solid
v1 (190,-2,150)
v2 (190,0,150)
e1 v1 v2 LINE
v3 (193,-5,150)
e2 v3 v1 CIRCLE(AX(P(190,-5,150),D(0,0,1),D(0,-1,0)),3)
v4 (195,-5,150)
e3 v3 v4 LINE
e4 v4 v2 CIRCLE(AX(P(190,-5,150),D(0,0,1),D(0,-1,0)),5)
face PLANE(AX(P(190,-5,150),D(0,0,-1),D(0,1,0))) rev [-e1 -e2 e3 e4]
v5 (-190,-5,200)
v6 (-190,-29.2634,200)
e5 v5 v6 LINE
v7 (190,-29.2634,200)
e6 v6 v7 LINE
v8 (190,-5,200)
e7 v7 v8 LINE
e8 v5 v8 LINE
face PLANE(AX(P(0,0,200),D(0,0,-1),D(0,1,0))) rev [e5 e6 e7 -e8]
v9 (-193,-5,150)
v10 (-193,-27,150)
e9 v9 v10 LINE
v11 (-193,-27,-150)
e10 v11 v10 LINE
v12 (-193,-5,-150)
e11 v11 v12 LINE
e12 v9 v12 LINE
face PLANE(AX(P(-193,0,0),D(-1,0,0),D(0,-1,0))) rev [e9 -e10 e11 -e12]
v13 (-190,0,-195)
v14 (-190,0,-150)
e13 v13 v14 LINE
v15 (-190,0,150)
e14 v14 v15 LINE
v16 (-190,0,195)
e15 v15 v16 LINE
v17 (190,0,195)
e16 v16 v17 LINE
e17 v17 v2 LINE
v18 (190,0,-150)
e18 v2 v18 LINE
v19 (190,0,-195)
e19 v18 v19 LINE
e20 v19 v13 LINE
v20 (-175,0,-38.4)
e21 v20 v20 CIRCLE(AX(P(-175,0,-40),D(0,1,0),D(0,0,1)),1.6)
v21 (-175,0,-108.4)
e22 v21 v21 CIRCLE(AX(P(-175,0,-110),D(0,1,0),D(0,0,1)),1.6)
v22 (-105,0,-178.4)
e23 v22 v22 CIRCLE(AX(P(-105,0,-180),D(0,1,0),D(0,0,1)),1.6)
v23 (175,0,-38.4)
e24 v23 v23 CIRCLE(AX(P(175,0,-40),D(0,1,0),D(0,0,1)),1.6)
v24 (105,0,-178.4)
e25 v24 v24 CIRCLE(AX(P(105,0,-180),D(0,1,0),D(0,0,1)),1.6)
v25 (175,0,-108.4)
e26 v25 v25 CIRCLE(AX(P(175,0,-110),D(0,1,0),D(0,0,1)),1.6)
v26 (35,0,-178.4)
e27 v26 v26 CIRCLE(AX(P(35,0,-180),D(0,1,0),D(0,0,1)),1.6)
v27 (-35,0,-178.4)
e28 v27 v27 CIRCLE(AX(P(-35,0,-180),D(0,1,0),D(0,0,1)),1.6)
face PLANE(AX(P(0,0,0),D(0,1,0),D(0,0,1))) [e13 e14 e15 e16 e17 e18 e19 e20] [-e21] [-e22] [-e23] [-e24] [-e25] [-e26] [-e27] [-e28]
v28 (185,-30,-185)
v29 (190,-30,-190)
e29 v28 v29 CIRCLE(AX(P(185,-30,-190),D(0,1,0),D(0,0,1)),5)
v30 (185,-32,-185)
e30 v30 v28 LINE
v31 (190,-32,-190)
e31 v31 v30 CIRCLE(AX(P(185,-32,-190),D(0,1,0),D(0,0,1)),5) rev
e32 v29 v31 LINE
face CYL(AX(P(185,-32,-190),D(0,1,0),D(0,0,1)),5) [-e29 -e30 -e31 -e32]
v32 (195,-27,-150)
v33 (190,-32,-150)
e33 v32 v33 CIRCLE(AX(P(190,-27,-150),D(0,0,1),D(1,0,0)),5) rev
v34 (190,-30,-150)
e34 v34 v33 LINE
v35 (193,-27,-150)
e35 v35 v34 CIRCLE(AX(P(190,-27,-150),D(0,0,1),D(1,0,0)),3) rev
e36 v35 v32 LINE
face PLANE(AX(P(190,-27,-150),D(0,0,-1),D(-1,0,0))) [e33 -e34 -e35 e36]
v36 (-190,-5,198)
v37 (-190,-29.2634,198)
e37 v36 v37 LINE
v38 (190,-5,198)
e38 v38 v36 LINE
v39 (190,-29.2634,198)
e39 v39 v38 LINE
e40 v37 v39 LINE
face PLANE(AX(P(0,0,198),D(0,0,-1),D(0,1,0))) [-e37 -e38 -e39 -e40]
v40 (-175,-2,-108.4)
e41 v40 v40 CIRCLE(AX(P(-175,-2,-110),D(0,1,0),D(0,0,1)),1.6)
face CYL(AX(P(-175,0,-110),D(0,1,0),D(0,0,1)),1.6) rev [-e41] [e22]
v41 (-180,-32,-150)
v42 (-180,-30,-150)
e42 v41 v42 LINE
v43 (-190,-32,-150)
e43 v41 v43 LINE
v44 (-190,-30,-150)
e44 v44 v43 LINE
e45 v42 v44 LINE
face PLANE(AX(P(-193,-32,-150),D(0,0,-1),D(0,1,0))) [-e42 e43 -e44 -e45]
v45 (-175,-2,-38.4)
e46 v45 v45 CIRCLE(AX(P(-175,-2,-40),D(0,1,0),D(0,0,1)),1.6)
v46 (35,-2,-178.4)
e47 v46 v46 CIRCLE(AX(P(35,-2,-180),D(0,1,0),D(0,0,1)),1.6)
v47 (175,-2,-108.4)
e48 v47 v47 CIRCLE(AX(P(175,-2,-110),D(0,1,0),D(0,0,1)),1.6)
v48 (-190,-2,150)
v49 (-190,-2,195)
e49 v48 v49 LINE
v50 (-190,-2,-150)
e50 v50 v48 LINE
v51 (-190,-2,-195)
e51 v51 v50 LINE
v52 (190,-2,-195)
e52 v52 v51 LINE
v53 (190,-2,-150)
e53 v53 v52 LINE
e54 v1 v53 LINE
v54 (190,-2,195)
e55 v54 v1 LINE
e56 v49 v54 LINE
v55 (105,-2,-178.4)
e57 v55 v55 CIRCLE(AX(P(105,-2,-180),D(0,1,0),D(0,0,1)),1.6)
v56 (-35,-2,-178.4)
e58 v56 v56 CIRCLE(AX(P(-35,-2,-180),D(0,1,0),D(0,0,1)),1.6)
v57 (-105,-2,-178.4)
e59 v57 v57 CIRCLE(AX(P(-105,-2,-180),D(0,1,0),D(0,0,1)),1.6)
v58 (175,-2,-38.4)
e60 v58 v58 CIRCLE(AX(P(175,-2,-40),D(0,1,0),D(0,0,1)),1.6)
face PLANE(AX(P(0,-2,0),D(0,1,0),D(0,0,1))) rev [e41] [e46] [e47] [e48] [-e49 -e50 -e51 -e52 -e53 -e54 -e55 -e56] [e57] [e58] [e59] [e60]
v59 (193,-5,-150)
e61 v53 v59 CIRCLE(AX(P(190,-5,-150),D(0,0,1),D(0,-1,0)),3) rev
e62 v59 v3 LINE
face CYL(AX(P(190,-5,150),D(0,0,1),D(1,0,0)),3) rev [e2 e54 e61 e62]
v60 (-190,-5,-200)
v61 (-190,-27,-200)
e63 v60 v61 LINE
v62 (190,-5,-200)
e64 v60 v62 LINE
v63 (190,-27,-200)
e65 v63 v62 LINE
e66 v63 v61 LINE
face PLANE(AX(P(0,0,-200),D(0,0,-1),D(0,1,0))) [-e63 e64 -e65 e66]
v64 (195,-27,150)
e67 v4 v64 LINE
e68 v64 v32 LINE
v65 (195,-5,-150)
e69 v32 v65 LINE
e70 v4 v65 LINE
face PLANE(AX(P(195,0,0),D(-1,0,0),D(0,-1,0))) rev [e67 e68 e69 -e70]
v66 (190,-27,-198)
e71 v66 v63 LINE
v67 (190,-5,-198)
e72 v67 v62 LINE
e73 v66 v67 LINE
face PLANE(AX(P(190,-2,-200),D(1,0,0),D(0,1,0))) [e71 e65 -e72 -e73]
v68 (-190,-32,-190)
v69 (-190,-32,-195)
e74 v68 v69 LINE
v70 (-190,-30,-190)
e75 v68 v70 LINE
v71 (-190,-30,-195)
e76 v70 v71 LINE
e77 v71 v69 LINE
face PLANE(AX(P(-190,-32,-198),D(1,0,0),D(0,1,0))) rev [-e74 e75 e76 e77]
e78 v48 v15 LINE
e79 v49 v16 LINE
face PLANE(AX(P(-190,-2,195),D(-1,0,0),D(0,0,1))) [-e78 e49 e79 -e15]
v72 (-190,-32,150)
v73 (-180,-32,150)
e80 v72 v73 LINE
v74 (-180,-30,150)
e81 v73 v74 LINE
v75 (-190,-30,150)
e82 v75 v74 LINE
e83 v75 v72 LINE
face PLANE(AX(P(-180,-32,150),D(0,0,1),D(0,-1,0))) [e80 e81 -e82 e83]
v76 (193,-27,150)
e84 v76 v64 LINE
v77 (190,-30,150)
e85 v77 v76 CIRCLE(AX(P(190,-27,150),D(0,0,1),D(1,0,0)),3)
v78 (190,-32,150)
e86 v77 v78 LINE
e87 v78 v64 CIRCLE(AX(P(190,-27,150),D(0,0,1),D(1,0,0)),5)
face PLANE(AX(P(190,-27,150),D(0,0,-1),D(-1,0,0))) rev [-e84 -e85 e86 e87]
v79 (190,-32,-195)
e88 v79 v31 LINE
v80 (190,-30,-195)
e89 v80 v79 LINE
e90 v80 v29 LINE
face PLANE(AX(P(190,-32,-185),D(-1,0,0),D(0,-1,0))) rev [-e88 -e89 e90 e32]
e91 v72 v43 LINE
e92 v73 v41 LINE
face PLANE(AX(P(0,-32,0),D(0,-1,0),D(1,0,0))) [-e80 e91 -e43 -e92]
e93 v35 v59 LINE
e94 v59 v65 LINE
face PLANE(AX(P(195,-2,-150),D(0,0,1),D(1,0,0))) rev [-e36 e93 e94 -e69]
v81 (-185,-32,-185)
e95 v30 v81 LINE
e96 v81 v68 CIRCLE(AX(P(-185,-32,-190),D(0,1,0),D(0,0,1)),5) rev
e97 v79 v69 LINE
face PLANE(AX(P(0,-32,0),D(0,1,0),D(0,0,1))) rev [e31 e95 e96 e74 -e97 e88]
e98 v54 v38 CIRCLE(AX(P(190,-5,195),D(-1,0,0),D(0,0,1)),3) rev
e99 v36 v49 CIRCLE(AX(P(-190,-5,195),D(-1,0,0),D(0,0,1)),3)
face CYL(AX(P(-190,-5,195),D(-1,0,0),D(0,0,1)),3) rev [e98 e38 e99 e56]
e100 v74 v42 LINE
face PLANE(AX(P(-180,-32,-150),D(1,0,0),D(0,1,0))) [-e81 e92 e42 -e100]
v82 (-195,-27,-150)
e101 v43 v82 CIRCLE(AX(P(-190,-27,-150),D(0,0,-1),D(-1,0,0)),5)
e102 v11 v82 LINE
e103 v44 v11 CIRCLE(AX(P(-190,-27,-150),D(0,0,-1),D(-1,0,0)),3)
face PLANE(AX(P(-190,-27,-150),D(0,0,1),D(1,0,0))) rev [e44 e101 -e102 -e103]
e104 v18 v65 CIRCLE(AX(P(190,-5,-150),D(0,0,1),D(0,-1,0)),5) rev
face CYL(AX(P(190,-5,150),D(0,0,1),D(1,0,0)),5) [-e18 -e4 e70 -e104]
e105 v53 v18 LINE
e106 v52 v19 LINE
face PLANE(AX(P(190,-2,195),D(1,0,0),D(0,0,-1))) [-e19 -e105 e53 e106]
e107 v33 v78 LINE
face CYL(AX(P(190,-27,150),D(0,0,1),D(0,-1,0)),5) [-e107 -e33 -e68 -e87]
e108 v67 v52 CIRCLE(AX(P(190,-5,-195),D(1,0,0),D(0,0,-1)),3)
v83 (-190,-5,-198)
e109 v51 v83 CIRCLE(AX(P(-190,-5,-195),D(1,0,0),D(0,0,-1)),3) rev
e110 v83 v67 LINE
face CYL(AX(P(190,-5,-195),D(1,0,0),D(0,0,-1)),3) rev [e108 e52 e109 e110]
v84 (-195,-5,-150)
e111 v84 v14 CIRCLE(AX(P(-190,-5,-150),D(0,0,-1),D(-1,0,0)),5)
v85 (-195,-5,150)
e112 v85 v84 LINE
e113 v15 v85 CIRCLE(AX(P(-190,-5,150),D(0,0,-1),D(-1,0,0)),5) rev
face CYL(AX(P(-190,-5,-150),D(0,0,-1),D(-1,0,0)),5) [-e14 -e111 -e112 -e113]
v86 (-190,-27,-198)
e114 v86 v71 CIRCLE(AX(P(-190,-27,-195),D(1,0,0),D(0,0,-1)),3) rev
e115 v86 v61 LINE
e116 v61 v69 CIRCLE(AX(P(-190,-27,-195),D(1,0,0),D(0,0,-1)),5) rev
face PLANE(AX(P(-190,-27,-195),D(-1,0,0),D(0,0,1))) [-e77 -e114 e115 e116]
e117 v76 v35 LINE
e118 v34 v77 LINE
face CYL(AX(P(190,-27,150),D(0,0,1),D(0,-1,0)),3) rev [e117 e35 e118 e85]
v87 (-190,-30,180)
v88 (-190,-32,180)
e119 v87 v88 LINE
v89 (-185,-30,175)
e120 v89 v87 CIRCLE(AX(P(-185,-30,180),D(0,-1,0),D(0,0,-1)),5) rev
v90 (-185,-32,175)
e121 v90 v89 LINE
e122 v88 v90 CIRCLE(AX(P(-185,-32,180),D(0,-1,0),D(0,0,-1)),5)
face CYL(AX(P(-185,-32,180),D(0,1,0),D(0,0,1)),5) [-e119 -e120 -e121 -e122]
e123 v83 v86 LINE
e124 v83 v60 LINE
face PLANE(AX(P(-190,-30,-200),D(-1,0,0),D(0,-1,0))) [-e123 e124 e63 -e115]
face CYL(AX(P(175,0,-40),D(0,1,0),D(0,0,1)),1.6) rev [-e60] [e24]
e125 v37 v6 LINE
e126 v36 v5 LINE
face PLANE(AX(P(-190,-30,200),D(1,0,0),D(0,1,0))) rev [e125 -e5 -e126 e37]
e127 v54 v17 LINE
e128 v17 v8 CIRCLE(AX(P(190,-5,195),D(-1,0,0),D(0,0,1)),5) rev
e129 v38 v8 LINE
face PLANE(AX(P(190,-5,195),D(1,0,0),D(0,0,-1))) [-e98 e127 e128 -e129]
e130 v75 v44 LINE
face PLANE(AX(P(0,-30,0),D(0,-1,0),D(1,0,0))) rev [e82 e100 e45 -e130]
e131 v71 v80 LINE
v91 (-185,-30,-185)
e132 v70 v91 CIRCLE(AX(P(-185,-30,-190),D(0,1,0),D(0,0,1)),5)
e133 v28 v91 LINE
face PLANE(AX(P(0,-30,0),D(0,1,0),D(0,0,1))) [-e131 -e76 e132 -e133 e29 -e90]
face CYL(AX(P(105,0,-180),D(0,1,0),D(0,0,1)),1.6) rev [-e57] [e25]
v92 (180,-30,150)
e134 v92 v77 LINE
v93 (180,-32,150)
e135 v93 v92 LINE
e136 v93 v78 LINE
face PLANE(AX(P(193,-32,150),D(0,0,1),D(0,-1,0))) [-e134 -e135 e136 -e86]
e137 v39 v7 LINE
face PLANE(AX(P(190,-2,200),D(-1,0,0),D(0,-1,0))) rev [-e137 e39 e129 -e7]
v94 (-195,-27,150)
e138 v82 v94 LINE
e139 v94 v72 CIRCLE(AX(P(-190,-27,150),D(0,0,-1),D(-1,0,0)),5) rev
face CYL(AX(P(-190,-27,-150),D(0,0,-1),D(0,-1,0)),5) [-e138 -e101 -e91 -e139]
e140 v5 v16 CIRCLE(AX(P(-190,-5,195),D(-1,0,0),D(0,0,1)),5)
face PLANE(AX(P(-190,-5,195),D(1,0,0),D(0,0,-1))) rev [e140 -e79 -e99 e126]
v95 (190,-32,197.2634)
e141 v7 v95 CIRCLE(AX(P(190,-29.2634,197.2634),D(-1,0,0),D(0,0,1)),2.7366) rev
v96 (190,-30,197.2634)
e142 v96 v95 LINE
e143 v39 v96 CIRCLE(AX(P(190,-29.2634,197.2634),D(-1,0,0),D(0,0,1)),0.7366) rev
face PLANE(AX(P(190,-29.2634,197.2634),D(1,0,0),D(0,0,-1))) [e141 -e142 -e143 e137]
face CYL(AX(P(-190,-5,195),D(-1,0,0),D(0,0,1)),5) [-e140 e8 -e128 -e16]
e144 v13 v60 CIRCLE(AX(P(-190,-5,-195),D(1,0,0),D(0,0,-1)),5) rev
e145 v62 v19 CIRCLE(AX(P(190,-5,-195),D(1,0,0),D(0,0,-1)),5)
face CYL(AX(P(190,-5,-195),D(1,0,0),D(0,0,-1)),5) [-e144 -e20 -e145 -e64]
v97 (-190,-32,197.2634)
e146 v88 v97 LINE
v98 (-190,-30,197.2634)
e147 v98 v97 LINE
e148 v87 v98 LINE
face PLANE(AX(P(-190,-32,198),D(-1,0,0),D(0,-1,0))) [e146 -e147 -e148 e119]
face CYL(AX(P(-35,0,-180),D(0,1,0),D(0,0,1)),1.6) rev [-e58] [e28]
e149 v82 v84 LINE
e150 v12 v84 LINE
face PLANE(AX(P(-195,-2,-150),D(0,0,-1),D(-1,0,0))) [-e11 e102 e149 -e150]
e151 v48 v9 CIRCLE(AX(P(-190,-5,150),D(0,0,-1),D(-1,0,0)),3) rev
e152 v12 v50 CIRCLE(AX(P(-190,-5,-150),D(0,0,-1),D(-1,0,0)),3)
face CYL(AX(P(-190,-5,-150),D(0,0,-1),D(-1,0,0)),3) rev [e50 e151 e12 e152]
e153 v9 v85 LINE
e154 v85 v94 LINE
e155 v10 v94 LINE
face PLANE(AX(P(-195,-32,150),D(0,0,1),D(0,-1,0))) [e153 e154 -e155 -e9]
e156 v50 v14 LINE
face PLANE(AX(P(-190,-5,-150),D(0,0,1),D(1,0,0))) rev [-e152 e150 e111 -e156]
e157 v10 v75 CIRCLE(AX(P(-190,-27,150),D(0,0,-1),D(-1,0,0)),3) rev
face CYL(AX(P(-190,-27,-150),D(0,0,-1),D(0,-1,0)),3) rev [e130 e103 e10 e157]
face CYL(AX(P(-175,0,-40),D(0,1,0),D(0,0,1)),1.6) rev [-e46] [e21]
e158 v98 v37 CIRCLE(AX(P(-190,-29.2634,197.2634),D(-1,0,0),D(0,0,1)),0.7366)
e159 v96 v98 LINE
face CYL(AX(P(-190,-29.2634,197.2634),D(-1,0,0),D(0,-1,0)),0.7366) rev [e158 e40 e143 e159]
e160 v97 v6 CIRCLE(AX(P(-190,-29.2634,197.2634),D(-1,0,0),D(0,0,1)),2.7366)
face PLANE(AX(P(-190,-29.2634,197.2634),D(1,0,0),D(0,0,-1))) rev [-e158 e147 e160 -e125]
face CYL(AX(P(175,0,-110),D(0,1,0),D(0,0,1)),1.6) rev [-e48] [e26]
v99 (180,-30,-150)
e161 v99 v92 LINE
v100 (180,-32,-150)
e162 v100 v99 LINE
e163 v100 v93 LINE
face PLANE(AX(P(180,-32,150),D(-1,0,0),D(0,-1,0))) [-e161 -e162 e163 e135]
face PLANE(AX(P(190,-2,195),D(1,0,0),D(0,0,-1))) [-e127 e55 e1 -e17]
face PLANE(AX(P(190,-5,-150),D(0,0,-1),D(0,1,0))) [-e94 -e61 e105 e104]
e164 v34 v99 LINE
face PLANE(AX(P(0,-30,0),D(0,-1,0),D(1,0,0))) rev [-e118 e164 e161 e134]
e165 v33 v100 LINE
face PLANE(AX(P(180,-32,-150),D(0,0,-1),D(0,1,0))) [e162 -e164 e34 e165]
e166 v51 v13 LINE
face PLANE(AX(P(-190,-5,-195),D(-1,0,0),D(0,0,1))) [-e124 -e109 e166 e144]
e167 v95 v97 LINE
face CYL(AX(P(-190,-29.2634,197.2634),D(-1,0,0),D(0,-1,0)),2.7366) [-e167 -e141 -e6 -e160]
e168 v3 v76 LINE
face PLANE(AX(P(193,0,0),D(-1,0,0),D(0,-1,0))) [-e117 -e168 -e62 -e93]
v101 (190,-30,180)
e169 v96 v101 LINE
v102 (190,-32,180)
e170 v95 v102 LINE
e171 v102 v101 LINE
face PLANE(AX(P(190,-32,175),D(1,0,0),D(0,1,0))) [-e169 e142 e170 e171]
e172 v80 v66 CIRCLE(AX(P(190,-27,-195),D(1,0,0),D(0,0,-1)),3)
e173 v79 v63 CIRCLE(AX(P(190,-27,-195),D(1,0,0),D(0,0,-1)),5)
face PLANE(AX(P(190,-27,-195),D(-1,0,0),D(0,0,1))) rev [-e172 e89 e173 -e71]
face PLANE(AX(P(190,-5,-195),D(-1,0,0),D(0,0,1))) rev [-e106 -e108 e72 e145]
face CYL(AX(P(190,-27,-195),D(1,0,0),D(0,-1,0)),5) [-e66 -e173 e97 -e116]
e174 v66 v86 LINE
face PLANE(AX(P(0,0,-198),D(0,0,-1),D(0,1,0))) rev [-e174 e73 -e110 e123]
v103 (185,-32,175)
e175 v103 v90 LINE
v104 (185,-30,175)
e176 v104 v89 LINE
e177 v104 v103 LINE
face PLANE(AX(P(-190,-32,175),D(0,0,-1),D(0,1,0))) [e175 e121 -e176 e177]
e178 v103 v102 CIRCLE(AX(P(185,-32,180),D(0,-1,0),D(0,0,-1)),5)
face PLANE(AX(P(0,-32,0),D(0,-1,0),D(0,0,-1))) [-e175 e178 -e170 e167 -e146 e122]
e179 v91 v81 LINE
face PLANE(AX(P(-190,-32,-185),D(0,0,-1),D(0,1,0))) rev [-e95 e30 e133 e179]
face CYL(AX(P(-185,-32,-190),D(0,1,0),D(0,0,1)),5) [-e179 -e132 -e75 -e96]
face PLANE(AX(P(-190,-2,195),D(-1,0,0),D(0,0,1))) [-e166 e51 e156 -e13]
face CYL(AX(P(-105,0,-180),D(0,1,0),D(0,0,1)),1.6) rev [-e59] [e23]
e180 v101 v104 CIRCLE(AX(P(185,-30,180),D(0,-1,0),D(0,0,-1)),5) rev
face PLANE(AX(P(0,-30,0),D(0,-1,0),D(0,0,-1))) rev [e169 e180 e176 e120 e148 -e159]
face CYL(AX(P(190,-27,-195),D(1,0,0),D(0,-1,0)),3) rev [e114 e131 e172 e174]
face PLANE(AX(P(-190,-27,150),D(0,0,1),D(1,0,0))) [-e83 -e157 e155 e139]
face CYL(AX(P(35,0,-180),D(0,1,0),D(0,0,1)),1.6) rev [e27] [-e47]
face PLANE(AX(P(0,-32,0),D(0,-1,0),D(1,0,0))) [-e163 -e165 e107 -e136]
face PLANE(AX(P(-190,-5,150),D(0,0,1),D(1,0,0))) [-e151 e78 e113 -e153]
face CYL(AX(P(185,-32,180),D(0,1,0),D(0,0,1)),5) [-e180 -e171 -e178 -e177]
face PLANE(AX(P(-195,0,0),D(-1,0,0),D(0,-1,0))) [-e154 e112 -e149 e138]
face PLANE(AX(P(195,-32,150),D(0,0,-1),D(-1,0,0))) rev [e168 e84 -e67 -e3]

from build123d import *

# Parameters (mm, degrees)
SKETCH1_W                     = 380
SKETCH1_H                     = 390
BASE_FLANGE1_DEPTH            = 2
EDGE_FLANGE3_DEPTH            = 380
EDGE_FLANGE11_DEPTH           = 380
EDGE_FLANGE12_STRIP_W         = 14
EDGE_FLANGE12_STRIP_H         = 2
EDGE_FLANGE12_STRIP_CUT_DEPTH = 380
EDGE_FLANGE12_DEPTH           = 380
EDGE_FLANGE13_STRIP_W         = 9.4732
EDGE_FLANGE13_STRIP_H         = 2
EDGE_FLANGE13_STRIP_CUT_DEPTH = 380
EDGE_FLANGE13_DEPTH           = 380
F_1_0MM_DOWEL_HOLE2_D         = 3.2
FILLET1_R                     = 5
EDGE_FLANGE14_DEPTH           = 300
EDGE_FLANGE15_DEPTH           = 300
EDGE_FLANGE16_STRIP_W         = 14
EDGE_FLANGE16_STRIP_H         = 2
EDGE_FLANGE16_STRIP_CUT_DEPTH = 300
EDGE_FLANGE16_DEPTH           = 300
EDGE_FLANGE17_STRIP_W         = 14
EDGE_FLANGE17_STRIP_H         = 2
EDGE_FLANGE17_STRIP_CUT_DEPTH = 300
EDGE_FLANGE17_DEPTH           = 300


# Sheet-metal steps are written as plain solids
with BuildPart() as part:
    # Sketch1 → Base-Flange1 (new body)
    with BuildSketch(Plane(origin=(0, 0, 0), x_dir=(1, 0, 0), z_dir=(0, 1, 0))):
        Rectangle(SKETCH1_W, SKETCH1_H)
    extrude(amount=-BASE_FLANGE1_DEPTH)

    # Edge-Flange3 section (across the edge) → Edge-Flange3 (add)
    with BuildSketch(Plane(origin=(-190, -2, -198), x_dir=(0, 0, 1), z_dir=(1, 0, 0))):
        with BuildLine():
            Line((-2, 3), (-2, 28))
            Line((-2, 28), (0, 28))
            Line((0, 28), (0, 3))
            ThreePointArc((0, 3), (0.878679656, 0.878679656), (3, 0))
            Line((3, 0), (3, -2))
            ThreePointArc((3, -2), (-0.535533906, -0.535533906), (-2, 3))
        make_face()
    extrude(amount=EDGE_FLANGE3_DEPTH)

    # Edge-Flange11 section (across the edge) → Edge-Flange11 (add)
    with BuildSketch(Plane(origin=(190, -2, 198), x_dir=(0, 0, -1), z_dir=(-1, 0, 0))):
        with BuildLine():
            Line((-2, 3), (-2, 28))
            Line((-2, 28), (0, 28))
            Line((0, 28), (0, 3))
            ThreePointArc((0, 3), (0.878679656, 0.878679656), (3, 0))
            Line((3, 0), (3, -2))
            ThreePointArc((3, -2), (-0.535533906, -0.535533906), (-2, 3))
        make_face()
    extrude(amount=EDGE_FLANGE11_DEPTH)

    # Edge-Flange12 strip (across the edge) → Edge-Flange12 strip cut (cut)
    with BuildSketch(Plane(origin=(-190, -30, -198), x_dir=(0, 1, 0), z_dir=(1, 0, 0))):
        with Locations((-4, -1)):
            Rectangle(EDGE_FLANGE12_STRIP_W, EDGE_FLANGE12_STRIP_H)
    extrude(amount=EDGE_FLANGE12_STRIP_CUT_DEPTH, mode=Mode.SUBTRACT)

    # Edge-Flange12 section (across the edge) → Edge-Flange12 (add)
    with BuildSketch(Plane(origin=(-190, -30, -198), x_dir=(0, 1, 0), z_dir=(1, 0, 0))):
        with BuildLine():
            Line((-2, 3), (-2, 13))
            Line((-2, 13), (0, 13))
            Line((0, 13), (0, 3))
            ThreePointArc((0, 3), (0.878679656, 0.878679656), (3, 0))
            Line((3, 0), (3, -2))
            ThreePointArc((3, -2), (-0.535533906, -0.535533906), (-2, 3))
        make_face()
    extrude(amount=EDGE_FLANGE12_DEPTH)

    # Edge-Flange13 strip (across the edge) → Edge-Flange13 strip cut (cut)
    with BuildSketch(Plane(origin=(190, -30, 198), x_dir=(0, 1, 0), z_dir=(-1, 0, 0))):
        with Locations((-4, -1)):
            Rectangle(EDGE_FLANGE13_STRIP_W, EDGE_FLANGE13_STRIP_H)
    extrude(amount=EDGE_FLANGE13_STRIP_CUT_DEPTH, mode=Mode.SUBTRACT)

    # Edge-Flange13 section (across the edge) → Edge-Flange13 (add)
    with BuildSketch(Plane(origin=(190, -30, 198), x_dir=(0, 1, 0), z_dir=(-1, 0, 0))):
        with BuildLine():
            Line((-2, 0.7366), (-2, 23))
            Line((-2, 23), (0, 23))
            Line((0, 23), (0, 0.7366))
            ThreePointArc((0, 0.7366), (0.215745145, 0.215745145), (0.7366, 0))
            Line((0.7366, 0), (0.7366, -2))
            ThreePointArc((0.7366, -2), (-1.198468417, -1.198468417), (-2, 0.7366))
        make_face()
    extrude(amount=EDGE_FLANGE13_DEPTH)

    # Ø1.0mm Dowel Hole2 (through all)
    with Locations(Plane(origin=(0, 0, 0), x_dir=(1, 0, 0), z_dir=(0, 1, 0))):
        with Locations((-175, 40), (-175, 110), (-105, 180), (-35, 180), (35, 180), (175, 110), (175, 40), (105, 180)):
            Hole(F_1_0MM_DOWEL_HOLE2_D / 2)

    # Fillet1
    fillet1_edges = [part.edges().sort_by_distance(p)[0] for p in [
        (190, -31, 175),
        (-190, -31, 175),
        (-190, -31, -185),
        (190, -31, -185),
    ]]
    fillet(fillet1_edges, radius=FILLET1_R)

    # Edge-Flange14 section (across the edge) → Edge-Flange14 (add)
    with BuildSketch(Plane(origin=(193, -2, -150), x_dir=(-1, 0, 0), z_dir=(0, 0, 1))):
        with BuildLine():
            Line((-2, 3), (-2, 30))
            Line((-2, 30), (0, 30))
            Line((0, 30), (0, 3))
            ThreePointArc((0, 3), (0.878679656, 0.878679656), (3, 0))
            Line((3, 0), (3, -2))
            ThreePointArc((3, -2), (-0.535533906, -0.535533906), (-2, 3))
        make_face()
    extrude(amount=EDGE_FLANGE14_DEPTH)

    # Edge-Flange15 section (across the edge) → Edge-Flange15 (add)
    with BuildSketch(Plane(origin=(-193, -2, 150), x_dir=(1, 0, 0), z_dir=(0, 0, -1))):
        with BuildLine():
            Line((-2, 3), (-2, 30))
            Line((-2, 30), (0, 30))
            Line((0, 30), (0, 3))
            ThreePointArc((0, 3), (0.878679656, 0.878679656), (3, 0))
            Line((3, 0), (3, -2))
            ThreePointArc((3, -2), (-0.535533906, -0.535533906), (-2, 3))
        make_face()
    extrude(amount=EDGE_FLANGE15_DEPTH)

    # Edge-Flange16 strip (across the edge) → Edge-Flange16 strip cut (cut)
    with BuildSketch(Plane(origin=(193, -32, -150), x_dir=(0, 1, 0), z_dir=(0, 0, 1))):
        with Locations((-2, -1)):
            Rectangle(EDGE_FLANGE16_STRIP_W, EDGE_FLANGE16_STRIP_H)
    extrude(amount=EDGE_FLANGE16_STRIP_CUT_DEPTH, mode=Mode.SUBTRACT)

    # Edge-Flange16 section (across the edge) → Edge-Flange16 (add)
    with BuildSketch(Plane(origin=(193, -32, -150), x_dir=(0, 1, 0), z_dir=(0, 0, 1))):
        with BuildLine():
            Line((0, 3), (0, 13))
            Line((0, 13), (2, 13))
            Line((2, 13), (2, 3))
            ThreePointArc((2, 3), (2.878679656, 0.878679656), (5, 0))
            Line((5, 0), (5, -2))
            ThreePointArc((5, -2), (1.464466094, -0.535533906), (0, 3))
        make_face()
    extrude(amount=EDGE_FLANGE16_DEPTH)

    # Edge-Flange17 strip (across the edge) → Edge-Flange17 strip cut (cut)
    with BuildSketch(Plane(origin=(-193, -32, 150), x_dir=(0, 1, 0), z_dir=(0, 0, -1))):
        with Locations((-2, -1)):
            Rectangle(EDGE_FLANGE17_STRIP_W, EDGE_FLANGE17_STRIP_H)
    extrude(amount=EDGE_FLANGE17_STRIP_CUT_DEPTH, mode=Mode.SUBTRACT)

    # Edge-Flange17 section (across the edge) → Edge-Flange17 (add)
    with BuildSketch(Plane(origin=(-193, -32, 150), x_dir=(0, 1, 0), z_dir=(0, 0, -1))):
        with BuildLine():
            Line((0, 3), (0, 13))
            Line((0, 13), (2, 13))
            Line((2, 13), (2, 3))
            ThreePointArc((2, 3), (2.878679656, 0.878679656), (5, 0))
            Line((5, 0), (5, -2))
            ThreePointArc((5, -2), (1.464466094, -0.535533906), (0, 3))
        make_face()
    extrude(amount=EDGE_FLANGE17_DEPTH)


solid = part.part
